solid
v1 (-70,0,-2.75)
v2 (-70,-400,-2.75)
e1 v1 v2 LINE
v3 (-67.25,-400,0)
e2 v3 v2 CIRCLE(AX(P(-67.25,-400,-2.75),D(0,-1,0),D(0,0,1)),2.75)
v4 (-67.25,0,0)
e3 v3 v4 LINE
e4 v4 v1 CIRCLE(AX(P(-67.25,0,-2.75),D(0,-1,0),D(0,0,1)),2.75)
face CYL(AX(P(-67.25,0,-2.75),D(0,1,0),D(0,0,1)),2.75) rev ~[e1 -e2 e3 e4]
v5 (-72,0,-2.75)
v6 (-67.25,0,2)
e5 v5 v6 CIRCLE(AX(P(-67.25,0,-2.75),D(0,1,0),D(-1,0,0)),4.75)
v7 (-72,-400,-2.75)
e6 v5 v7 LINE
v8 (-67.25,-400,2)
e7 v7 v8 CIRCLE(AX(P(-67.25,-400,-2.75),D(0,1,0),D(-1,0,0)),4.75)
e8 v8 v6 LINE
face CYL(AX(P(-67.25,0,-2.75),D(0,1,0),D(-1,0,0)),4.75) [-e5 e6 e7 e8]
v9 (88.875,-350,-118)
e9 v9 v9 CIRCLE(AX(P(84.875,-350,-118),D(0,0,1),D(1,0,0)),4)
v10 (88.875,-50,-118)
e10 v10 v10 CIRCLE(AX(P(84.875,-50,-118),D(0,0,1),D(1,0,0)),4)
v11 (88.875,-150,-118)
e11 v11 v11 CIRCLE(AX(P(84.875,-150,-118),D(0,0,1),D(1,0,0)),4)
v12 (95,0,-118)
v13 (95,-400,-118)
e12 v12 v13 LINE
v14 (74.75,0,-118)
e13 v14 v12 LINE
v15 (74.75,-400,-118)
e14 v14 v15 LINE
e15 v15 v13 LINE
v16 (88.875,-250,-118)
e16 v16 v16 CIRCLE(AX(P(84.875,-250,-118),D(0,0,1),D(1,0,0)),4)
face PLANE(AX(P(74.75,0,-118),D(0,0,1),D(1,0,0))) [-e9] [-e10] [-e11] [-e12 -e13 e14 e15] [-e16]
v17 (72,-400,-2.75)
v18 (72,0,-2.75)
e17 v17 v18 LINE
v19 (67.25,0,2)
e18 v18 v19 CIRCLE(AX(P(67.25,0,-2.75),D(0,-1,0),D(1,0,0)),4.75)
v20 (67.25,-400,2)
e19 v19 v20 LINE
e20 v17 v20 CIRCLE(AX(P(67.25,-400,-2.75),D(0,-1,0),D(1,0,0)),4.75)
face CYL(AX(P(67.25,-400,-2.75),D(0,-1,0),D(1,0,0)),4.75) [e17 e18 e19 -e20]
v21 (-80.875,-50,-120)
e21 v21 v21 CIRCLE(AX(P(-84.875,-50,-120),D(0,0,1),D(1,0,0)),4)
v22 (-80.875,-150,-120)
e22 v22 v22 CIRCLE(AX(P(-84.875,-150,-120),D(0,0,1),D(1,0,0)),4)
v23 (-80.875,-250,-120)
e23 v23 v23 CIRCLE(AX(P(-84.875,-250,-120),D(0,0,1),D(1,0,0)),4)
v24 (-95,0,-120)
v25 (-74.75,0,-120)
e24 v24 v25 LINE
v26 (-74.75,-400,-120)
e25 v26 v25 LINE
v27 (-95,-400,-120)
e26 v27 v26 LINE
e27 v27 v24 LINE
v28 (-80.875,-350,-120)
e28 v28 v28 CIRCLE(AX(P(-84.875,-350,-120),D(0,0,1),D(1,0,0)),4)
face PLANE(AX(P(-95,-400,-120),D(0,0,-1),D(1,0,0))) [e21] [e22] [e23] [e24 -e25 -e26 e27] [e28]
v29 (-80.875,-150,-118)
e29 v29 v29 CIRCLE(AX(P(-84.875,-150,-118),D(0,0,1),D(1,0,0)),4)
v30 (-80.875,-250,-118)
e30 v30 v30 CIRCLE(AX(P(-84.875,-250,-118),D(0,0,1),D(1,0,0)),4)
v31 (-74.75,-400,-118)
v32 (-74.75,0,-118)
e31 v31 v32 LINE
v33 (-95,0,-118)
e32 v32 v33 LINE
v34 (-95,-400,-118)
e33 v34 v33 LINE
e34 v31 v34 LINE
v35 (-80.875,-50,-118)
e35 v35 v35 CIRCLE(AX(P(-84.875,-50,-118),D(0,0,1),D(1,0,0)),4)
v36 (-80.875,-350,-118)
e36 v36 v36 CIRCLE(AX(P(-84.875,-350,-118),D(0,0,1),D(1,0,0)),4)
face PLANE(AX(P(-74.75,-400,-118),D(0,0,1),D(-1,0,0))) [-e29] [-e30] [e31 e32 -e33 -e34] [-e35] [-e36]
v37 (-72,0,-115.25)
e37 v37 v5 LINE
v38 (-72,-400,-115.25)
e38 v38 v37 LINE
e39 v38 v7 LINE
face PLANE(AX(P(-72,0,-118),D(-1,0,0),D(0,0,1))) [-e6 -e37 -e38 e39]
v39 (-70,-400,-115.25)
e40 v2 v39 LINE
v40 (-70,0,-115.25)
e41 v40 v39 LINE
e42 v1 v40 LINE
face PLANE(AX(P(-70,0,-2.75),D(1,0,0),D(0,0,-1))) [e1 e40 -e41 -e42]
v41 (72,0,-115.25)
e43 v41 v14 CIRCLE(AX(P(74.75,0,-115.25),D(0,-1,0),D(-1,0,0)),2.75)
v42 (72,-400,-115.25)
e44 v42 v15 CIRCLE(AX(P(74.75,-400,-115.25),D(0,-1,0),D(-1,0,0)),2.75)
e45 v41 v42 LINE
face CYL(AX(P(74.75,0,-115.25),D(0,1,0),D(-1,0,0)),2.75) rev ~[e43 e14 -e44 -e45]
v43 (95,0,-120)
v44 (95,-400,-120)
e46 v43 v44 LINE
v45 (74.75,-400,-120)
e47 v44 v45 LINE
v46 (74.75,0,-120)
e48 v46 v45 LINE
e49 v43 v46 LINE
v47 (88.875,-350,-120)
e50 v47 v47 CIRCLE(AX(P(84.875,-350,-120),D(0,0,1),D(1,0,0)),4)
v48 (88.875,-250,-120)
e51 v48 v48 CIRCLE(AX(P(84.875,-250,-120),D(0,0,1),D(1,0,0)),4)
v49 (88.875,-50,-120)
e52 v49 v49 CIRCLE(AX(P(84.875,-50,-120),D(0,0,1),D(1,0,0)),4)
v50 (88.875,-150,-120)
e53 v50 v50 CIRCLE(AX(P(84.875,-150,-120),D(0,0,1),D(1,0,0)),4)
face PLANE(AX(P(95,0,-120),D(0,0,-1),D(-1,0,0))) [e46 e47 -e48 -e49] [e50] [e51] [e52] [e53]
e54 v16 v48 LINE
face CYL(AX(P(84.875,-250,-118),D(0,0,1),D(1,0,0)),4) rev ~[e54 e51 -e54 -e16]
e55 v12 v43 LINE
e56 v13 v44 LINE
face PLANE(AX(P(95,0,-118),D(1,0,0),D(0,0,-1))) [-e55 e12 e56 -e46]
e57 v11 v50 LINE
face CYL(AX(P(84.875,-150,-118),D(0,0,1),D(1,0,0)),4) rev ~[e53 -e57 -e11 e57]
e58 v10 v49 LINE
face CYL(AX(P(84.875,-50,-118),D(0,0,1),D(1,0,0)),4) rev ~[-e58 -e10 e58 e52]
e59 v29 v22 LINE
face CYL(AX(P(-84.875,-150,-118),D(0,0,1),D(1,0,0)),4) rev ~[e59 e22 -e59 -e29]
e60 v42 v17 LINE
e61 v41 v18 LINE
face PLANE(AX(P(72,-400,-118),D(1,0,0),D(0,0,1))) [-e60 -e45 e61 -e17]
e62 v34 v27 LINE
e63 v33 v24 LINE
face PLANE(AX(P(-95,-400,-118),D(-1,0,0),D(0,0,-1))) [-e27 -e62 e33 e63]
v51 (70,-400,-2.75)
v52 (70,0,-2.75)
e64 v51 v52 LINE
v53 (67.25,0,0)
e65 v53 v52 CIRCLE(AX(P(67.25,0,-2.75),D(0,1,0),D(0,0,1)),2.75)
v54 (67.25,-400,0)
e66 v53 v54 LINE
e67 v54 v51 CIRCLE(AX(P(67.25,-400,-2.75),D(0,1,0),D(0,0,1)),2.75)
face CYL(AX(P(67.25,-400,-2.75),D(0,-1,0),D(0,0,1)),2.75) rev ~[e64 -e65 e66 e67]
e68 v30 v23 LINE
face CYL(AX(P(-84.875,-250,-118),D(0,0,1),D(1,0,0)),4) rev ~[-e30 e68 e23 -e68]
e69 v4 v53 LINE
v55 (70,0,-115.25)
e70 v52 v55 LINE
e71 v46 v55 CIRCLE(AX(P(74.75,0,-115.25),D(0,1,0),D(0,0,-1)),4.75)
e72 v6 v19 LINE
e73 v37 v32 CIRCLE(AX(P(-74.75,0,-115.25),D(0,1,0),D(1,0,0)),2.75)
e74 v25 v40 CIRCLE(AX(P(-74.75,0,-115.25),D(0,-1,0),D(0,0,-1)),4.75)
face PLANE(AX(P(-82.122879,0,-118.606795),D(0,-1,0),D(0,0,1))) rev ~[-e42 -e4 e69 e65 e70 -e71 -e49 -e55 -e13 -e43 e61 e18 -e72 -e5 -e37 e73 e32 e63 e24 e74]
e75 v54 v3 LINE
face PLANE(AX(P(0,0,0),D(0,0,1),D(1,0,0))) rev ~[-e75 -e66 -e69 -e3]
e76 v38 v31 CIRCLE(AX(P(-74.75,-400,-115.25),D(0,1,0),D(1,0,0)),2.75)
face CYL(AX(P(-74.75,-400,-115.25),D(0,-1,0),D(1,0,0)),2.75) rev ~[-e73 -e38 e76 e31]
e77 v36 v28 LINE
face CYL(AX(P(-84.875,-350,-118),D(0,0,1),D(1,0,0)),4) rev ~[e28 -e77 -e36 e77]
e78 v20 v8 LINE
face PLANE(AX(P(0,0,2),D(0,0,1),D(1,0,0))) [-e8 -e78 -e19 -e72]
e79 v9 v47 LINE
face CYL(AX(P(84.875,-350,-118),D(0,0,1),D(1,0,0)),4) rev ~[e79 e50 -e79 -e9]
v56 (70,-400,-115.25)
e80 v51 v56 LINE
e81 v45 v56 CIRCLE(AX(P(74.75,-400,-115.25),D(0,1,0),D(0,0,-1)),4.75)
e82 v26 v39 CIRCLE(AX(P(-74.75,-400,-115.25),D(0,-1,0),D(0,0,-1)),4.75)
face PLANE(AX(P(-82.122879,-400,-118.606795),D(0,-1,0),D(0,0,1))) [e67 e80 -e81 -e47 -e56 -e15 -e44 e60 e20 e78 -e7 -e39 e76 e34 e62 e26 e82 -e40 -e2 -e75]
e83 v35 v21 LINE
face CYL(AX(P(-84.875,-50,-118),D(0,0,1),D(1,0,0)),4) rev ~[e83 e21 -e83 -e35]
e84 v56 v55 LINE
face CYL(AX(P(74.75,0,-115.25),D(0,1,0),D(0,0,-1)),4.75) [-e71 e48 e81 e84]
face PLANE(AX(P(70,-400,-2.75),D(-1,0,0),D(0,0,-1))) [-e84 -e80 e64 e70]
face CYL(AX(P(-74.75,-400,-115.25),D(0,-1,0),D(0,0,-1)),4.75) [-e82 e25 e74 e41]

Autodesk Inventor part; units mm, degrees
ref_plane "YZ Plane" through (0, 0, 0) normal (1, 0, 0) x (0, 1, 0)
ref_plane "XZ Plane" through (0, 0, 0) normal (0, 1, 0) x (-1, 0, 0)
ref_plane "XY Plane" through (0, 0, 0) normal (0, 0, 1) x (1, 0, 0)
sketch "Sketch1" plane through (0, 0, 0) normal (0, 0, 1) x (1, 0, 0)
  line L0 (-70, 0) -> (70, 0)
  line L1 (70, 0) -> (70, -400)
  line L2 (70, -400) -> (-70, -400)
  line L3 (-70, -400) -> (-70, 0)
  point P0 (0, 0)
  point P1 (0, 0)
  dimension "d0" = 140
  dimension "d1" = 400
extrude "Plate1" add sketch "Sketch1" along normal blind 2
sketch "Sketch2" plane through (72, -400, 2) normal (-1, 0, 0) x (0, -1, 0)
  line L0 (-400, 0) -> (0, 0)
  line L1 (0, 0) -> (0, -120)
  line L2 (0, -120) -> (-400, -120)
  line L3 (-400, -120) -> (-400, 0)
edge flange "Flange1" height 120 angle 90 thickness 2 bend radius 2.75 thickness toward (-1, 0, 0) relief round relief width 2 relief depth 1 edges at (70, -200, 0) wall of the first edge with corners at (72, 0, 2) (72, -400, 2) (72, -400, -118) (72, 0, -118)
bend "Bend1"
corner "Corner1"
sketch "Sketch3" plane through (-72, 0, 2) normal (1, 0, 0) x (0, 1, 0)
  line L0 (-400, 0) -> (0, 0)
  line L1 (0, 0) -> (0, -120)
  line L2 (0, -120) -> (-400, -120)
  line L3 (-400, -120) -> (-400, 0)
edge flange "Flange2" height 120 angle 90 thickness 2 bend radius 2.75 thickness toward (1, 0, 0) relief round relief width 2 relief depth 1 edges at (-70, -200, 0) wall of the first edge with corners at (-72, -400, 2) (-72, 0, 2) (-72, 0, -118) (-72, -400, -118)
bend "Bend2"
corner "Corner2"
sketch "Sketch4" plane through (70, 0, -120) normal (0, 0, 1) x (1, 0, 0)
  line L0 (0, -400) -> (0, 0)
  line L1 (0, 0) -> (25, 0)
  line L2 (25, 0) -> (25, -400)
  line L3 (25, -400) -> (0, -400)
edge flange "Flange3" height 25 angle 90 thickness 2 bend radius 2.75 thickness toward (0, 0, 1) relief round relief width 2 relief depth 1 edges at (72, -200, -118) wall of the first edge with corners at (70, -400, -120) (70, 0, -120) (95, 0, -120) (95, -400, -120)
bend "Bend3"
corner "Corner3"
sketch "Sketch5" plane through (-70, -400, -120) normal (0, 0, 1) x (1, 0, 0)
  line L0 (0, 400) -> (0, 0)
  line L1 (0, 0) -> (-25, 0)
  line L2 (-25, 0) -> (-25, 400)
  line L3 (-25, 400) -> (0, 400)
edge flange "Flange4" height 25 angle 90 thickness 2 bend radius 2.75 thickness toward (0, 0, 1) relief round relief width 2 relief depth 1 edges at (-72, -200, -118) wall of the first edge with corners at (-70, 0, -120) (-70, -400, -120) (-95, -400, -120) (-95, 0, -120)
bend "Bend4"
corner "Corner4"
sketch "Sketch6" plane through (95, -400, -118) normal (0, 0, 1) x (1, 0, 0)
  circle A0 centre (-10.125, 350) radius 4
  line L0 (-20.25, 400) -> (0, 400) projected
  point P0 (-95, 400)
  point P1 (-10.125, 400)
  dimension "d43" = 8
  dimension "d44" = 50
extrude "Extrusion1" cut sketch "Sketch6" against normal through all
pattern_linear "Rectangular Pattern2" count 4 spacing 100 along (0, -1, 0) count 2 spacing 169.75 along (-1, 0, 0) of "Extrusion1"
equation "\"d0\" = Ширина_крепления_корпуса"
equation "\"d1\" = Длина_базовой_пластины"
equation "\"d2\" = Thickness"
equation "\"d3\" = BendReliefWidth"
equation "\"d4\" = BendReliefDepth"
equation "\"d5\" = MinimumRemnant"
equation "\"d6\" = TransitionRadius"
equation "\"d7\" = Длина_крепления_корпуса"
equation "\"d9\" = BendRadius"
equation "\"d10\" = CornerReliefSize"
equation "\"d11\" = GapSize"
equation "\"d12\" = JacobiRadiusSize"
equation "\"d13\" = BendReliefWidth"
equation "\"d14\" = BendReliefDepth"
equation "\"d15\" = MinimumRemnant"
equation "\"d16\" = TransitionRadius"
equation "\"d17\" = Длина_крепления_корпуса"
equation "\"d19\" = BendRadius"
equation "\"d20\" = CornerReliefSize"
equation "\"d21\" = GapSize"
equation "\"d22\" = JacobiRadiusSize"
equation "\"d23\" = BendReliefWidth"
equation "\"d24\" = BendReliefDepth"
equation "\"d25\" = MinimumRemnant"
equation "\"d26\" = TransitionRadius"
equation "\"d29\" = BendRadius"
equation "\"d30\" = CornerReliefSize"
equation "\"d31\" = GapSize"
equation "\"d32\" = JacobiRadiusSize"
equation "\"d33\" = BendReliefWidth"
equation "\"d34\" = BendReliefDepth"
equation "\"d35\" = MinimumRemnant"
equation "\"d36\" = TransitionRadius"
equation "\"d39\" = BendRadius"
equation "\"d40\" = CornerReliefSize"
equation "\"d41\" = GapSize"
equation "\"d42\" = JacobiRadiusSize"
equation "\"BendReliefWidth\" = Thickness"
equation "\"BendReliefDepth\" = 0.5 * Thickness"
equation "\"CornerReliefSize\" = 4 * Thickness"
equation "\"MinimumRemnant\" = 2 * Thickness"
equation "\"TransitionRadius\" = BendRadius"
equation "\"JacobiRadiusSize\" = BendRadius"
equation "\"GapSize\" = Thickness"
equation "\"Ширина_крепления_корпуса\" = 140"
equation "\"Длина_базовой_пластины\" = 400"
equation "\"Thickness\" = 2"
equation "\"Длина_крепления_корпуса\" = 120"
equation "\"BendRadius\" = 2.75"
properties part number "Кожух" material "Stainless Steel"
